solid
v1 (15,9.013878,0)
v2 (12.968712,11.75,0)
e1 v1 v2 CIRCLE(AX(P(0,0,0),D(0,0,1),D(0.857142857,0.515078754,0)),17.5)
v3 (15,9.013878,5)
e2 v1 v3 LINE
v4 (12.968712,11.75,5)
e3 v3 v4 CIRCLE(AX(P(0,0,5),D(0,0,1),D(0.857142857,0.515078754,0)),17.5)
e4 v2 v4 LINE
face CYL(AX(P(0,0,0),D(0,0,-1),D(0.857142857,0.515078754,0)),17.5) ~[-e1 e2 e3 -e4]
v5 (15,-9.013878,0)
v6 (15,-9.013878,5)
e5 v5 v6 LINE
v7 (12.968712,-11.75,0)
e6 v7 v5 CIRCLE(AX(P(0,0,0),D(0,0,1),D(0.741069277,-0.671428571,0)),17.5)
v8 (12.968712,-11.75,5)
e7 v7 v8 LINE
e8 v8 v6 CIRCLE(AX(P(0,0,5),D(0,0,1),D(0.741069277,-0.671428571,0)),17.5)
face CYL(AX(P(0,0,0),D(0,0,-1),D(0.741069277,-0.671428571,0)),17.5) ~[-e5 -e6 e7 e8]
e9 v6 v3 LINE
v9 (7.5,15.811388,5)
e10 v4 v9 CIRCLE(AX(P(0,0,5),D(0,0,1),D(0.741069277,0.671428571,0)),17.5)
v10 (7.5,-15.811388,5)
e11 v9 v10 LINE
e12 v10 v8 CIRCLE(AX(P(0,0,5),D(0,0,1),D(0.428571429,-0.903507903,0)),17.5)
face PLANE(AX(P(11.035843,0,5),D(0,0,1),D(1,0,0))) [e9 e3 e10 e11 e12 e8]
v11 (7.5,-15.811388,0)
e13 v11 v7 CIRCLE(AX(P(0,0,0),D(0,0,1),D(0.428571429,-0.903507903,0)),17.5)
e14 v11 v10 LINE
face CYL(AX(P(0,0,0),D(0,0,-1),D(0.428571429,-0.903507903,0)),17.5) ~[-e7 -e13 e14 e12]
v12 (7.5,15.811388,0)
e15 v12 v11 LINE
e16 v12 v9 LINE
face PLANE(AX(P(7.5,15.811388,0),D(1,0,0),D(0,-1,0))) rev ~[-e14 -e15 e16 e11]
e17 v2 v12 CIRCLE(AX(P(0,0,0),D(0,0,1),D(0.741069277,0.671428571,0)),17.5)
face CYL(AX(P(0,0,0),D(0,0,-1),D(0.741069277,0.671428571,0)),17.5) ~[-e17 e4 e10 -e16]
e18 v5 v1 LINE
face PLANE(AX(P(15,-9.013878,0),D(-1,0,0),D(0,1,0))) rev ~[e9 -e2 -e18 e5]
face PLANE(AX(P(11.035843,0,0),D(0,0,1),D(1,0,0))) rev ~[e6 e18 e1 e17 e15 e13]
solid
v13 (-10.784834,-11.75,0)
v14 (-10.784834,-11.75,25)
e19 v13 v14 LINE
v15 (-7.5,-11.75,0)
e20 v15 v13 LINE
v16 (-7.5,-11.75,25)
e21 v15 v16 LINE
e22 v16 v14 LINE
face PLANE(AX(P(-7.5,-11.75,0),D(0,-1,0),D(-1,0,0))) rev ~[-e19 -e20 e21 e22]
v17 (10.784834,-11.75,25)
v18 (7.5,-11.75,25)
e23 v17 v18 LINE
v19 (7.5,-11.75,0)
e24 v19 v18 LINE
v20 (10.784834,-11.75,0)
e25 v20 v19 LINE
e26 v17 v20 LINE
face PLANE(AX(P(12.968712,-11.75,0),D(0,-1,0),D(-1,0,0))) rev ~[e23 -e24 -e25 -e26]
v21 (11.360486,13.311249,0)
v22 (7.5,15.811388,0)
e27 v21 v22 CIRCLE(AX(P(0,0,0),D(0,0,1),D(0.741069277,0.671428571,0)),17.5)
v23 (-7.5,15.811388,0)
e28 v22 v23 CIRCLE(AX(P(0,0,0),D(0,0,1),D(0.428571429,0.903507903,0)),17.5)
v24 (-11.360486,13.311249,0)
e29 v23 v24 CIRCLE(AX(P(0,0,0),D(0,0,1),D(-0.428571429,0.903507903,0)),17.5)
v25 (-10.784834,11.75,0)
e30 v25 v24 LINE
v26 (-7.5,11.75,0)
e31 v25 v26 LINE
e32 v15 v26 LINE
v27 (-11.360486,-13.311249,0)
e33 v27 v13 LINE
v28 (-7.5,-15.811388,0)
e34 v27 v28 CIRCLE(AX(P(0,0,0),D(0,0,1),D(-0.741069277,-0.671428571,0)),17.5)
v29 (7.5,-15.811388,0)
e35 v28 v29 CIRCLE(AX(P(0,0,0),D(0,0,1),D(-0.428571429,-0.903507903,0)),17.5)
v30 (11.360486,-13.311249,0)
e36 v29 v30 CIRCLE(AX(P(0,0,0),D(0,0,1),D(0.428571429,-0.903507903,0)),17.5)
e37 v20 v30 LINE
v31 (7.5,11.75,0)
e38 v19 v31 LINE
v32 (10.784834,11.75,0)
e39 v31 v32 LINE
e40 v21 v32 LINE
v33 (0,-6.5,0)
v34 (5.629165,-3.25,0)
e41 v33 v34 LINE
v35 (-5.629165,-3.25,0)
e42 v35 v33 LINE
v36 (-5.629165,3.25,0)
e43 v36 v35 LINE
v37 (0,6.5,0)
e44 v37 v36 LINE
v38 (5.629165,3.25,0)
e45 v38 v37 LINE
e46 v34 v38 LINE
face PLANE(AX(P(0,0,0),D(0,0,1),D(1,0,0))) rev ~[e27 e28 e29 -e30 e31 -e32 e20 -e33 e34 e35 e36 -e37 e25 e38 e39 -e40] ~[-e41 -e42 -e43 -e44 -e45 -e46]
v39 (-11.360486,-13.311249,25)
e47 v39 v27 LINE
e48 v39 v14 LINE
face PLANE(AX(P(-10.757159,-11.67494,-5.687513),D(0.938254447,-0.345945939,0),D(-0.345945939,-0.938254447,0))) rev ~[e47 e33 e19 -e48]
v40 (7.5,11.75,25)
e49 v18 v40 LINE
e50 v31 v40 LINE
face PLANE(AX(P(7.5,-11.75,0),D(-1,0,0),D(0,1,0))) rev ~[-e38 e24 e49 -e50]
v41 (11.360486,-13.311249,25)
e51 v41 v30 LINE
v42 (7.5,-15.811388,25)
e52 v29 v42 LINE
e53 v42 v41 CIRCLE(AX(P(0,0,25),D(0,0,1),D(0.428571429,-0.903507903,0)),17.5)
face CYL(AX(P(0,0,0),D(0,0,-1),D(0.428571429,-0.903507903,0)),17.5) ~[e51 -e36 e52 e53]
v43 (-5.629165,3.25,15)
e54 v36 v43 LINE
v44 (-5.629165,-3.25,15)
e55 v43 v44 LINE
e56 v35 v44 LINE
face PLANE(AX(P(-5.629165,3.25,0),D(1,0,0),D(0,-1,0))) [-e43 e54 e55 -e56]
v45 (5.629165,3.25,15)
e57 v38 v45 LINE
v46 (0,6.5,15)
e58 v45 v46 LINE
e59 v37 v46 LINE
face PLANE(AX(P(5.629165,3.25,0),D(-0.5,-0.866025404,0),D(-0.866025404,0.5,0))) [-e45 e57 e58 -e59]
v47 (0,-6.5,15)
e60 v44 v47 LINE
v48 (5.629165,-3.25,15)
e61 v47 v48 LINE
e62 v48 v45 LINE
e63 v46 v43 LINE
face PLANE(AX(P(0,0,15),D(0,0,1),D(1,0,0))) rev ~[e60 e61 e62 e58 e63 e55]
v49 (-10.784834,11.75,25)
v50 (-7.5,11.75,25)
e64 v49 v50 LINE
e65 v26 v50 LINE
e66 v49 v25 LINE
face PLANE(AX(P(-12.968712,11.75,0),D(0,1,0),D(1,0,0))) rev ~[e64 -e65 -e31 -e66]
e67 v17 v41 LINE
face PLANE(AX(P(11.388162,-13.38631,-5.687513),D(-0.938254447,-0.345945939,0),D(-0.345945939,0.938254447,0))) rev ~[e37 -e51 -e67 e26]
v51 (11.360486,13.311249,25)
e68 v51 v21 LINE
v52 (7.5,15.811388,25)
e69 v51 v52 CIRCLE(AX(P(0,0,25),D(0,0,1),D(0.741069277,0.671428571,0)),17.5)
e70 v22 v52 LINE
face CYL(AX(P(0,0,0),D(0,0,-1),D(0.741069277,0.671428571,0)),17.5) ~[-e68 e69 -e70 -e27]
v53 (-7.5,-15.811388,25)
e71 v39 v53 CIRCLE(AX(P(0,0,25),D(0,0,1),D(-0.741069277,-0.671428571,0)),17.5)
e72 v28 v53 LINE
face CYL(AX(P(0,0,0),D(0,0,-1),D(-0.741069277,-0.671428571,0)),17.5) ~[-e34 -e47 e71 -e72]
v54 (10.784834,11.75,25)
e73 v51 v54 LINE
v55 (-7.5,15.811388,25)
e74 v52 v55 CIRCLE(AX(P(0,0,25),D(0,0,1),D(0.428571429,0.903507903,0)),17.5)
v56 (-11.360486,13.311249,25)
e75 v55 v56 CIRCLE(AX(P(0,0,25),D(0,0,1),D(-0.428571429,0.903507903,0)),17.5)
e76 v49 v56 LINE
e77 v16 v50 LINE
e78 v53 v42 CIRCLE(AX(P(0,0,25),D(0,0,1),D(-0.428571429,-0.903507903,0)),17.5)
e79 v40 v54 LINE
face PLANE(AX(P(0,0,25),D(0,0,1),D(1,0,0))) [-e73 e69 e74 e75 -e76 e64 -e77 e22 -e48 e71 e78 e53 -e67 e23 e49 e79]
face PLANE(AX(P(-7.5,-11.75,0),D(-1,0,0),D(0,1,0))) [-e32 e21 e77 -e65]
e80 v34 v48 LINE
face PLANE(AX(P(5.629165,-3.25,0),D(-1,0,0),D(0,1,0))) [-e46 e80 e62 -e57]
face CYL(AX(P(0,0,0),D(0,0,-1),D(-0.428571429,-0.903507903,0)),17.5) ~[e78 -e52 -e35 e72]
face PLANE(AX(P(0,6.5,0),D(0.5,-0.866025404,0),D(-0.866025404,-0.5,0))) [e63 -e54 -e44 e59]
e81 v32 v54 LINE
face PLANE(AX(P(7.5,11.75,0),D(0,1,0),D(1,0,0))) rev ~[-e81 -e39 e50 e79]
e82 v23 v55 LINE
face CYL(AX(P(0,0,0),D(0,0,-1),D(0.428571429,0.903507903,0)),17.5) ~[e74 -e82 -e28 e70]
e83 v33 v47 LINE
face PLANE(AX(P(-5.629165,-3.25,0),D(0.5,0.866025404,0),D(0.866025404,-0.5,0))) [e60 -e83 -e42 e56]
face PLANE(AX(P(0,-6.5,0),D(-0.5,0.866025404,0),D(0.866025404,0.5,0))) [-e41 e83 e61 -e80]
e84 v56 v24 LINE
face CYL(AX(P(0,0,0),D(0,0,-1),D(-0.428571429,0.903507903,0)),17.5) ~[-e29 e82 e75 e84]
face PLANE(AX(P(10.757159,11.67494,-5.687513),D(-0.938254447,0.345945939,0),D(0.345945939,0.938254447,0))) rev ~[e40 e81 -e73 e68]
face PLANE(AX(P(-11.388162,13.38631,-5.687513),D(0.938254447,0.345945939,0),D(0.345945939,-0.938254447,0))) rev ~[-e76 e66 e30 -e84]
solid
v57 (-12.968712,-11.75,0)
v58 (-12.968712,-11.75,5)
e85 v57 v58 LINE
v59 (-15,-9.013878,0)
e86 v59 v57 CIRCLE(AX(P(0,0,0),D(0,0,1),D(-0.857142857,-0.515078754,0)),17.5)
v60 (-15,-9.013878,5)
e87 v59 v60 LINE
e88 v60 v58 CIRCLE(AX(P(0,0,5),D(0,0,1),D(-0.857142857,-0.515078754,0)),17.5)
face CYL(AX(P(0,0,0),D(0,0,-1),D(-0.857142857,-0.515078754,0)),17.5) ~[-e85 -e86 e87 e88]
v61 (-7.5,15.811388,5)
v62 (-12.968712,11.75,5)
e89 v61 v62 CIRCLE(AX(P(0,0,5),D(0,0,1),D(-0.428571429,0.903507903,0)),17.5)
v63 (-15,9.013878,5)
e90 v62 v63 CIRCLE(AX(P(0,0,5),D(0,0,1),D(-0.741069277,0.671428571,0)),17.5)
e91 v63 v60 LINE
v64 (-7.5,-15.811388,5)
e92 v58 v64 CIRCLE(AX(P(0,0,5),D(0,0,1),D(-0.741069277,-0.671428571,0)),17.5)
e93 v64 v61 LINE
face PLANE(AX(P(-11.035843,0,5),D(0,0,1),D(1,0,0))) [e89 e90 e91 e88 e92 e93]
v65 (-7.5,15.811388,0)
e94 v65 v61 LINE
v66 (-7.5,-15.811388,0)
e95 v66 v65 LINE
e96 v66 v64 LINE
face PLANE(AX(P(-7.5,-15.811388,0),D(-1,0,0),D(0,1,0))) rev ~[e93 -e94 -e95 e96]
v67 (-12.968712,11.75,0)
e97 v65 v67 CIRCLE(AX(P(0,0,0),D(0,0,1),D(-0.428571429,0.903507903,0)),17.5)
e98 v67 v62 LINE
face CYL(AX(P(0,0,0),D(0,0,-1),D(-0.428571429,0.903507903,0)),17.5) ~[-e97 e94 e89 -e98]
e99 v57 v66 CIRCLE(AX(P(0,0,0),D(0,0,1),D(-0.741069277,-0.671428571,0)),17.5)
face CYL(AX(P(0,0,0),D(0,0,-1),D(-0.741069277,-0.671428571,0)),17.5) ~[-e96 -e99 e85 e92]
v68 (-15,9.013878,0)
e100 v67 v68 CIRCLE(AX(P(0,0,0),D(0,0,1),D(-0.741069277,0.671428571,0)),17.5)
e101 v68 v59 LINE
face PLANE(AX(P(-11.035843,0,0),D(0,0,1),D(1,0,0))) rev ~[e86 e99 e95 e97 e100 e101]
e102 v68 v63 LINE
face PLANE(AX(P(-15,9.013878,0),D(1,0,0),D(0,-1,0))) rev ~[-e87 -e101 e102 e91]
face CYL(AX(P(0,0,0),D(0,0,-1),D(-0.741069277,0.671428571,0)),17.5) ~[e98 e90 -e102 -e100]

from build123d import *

# Parameters (mm, degrees)
F1_DEPTH    = 5
F0_W        = 15
F0_H        = 23.5
F2_DEPTH    = 25
F3_T1_DEPTH = 36.3750267574
F4_DEPTH    = 15


# Not quite as in the source:
# - a fillet or chamfer that OpenCascade refuses, or shapes differently, is made with other operations: its cross-section is extruded or revolved along the edge and cut away or added
# - a feature names something its author has since deleted; it is built from what else it names


with BuildPart() as f1:
    # F0 (on Top) → F1 (new body)
    with BuildSketch(Plane.XY):
        with BuildLine():
            Line((15, -9.0138781887), (15, 9.0138781887))
            ThreePointArc((15, 9.0138781887), (14.0511141288, 10.4314999755), (12.9687123493, 11.75))
            Line((12.9687123493, 11.75), (7.5, 11.75))
            Line((7.5, 11.75), (7.5, -11.75))
            Line((7.5, -11.75), (12.9687123493, -11.75))
            ThreePointArc((12.9687123493, -11.75), (14.0511141288, -10.4314999755), (15, -9.0138781887))
        make_face()
        with BuildLine():
            ThreePointArc((7.5, -15.8113883008), (10.4338758399, -14.0493499834), (12.9687123493, -11.75))
            Line((12.9687123493, -11.75), (7.5, -11.75))
            Line((7.5, -11.75), (7.5, -15.8113883008))
        make_face()
        with BuildLine():
            Line((7.5, 11.75), (12.9687123493, 11.75))
            ThreePointArc((12.9687123493, 11.75), (10.4338758399, 14.0493499834), (7.5, 15.8113883008))
            Line((7.5, 15.8113883008), (7.5, 11.75))
        make_face()
    extrude(amount=F1_DEPTH)


with BuildPart() as f1b:
    # F0 (on Top) → F1, piece 2 (new body)
    with BuildSketch(Plane.XY):
        with BuildLine():
            Line((-7.5, -11.75), (-7.5, 11.75))
            Line((-7.5, 11.75), (-12.9687123493, 11.75))
            ThreePointArc((-12.9687123493, 11.75), (-14.0511141288, 10.4314999755), (-15, 9.0138781887))
            Line((-15, 9.0138781887), (-15, -9.0138781887))
            ThreePointArc((-15, -9.0138781887), (-14.0511141288, -10.4314999755), (-12.9687123493, -11.75))
            Line((-12.9687123493, -11.75), (-7.5, -11.75))
        make_face()
        with BuildLine():
            Line((-7.5, 11.75), (-7.5, 15.8113883008))
            ThreePointArc((-7.5, 15.8113883008), (-10.4338758399, 14.0493499834), (-12.9687123493, 11.75))
            Line((-12.9687123493, 11.75), (-7.5, 11.75))
        make_face()
        with BuildLine():
            ThreePointArc((-12.9687123493, -11.75), (-10.4338758399, -14.0493499834), (-7.5, -15.8113883008))
            Line((-7.5, -15.8113883008), (-7.5, -11.75))
            Line((-7.5, -11.75), (-12.9687123493, -11.75))
        make_face()
    extrude(amount=F1_DEPTH)


with BuildPart() as f2:
    # F0 (on Top) → F2 (new body)
    with BuildSketch(Plane.XY):
        Rectangle(F0_W, F0_H)
        Polygon((-5.6291651246, 3.25), (0, 6.5), (5.6291651246, 3.25), (5.6291651246, -3.25), (0, -6.5), (-5.6291651246, -3.25), align=None, mode=Mode.SUBTRACT)
        with BuildLine():
            ThreePointArc((-12.9687123493, -11.75), (-10.4338758399, -14.0493499834), (-7.5, -15.8113883008))
            Line((-7.5, -15.8113883008), (-7.5, -11.75))
            Line((-7.5, -11.75), (-12.9687123493, -11.75))
        make_face()
        with BuildLine():
            Line((-7.5, 11.75), (-7.5, 15.8113883008))
            ThreePointArc((-7.5, 15.8113883008), (-10.4338758399, 14.0493499834), (-12.9687123493, 11.75))
            Line((-12.9687123493, 11.75), (-7.5, 11.75))
        make_face()
        with BuildLine():
            Line((7.5, 11.75), (12.9687123493, 11.75))
            ThreePointArc((12.9687123493, 11.75), (10.4338758399, 14.0493499834), (7.5, 15.8113883008))
            Line((7.5, 15.8113883008), (7.5, 11.75))
        make_face()
        with BuildLine():
            ThreePointArc((7.5, -15.8113883008), (10.4338758399, -14.0493499834), (12.9687123493, -11.75))
            Line((12.9687123493, -11.75), (7.5, -11.75))
            Line((7.5, -11.75), (7.5, -15.8113883008))
        make_face()
        with BuildLine():
            Line((7.5, 11.75), (7.5, 15.8113883008))
            ThreePointArc((7.5, 15.8113883008), (0, 17.5), (-7.5, 15.8113883008))
            Line((-7.5, 15.8113883008), (-7.5, 11.75))
            Line((-7.5, 11.75), (7.5, 11.75))
        make_face()
        with BuildLine():
            ThreePointArc((-7.5, -15.8113883008), (0, -17.5), (7.5, -15.8113883008))
            Line((7.5, -15.8113883008), (7.5, -11.75))
            Line((7.5, -11.75), (-7.5, -11.75))
            Line((-7.5, -11.75), (-7.5, -15.8113883008))
        make_face()
        Polygon((5.6291651246, 3.25), (0, 6.5), (-5.6291651246, 3.25), (-5.6291651246, -3.25), (0, -6.5), (5.6291651246, -3.25), align=None)
    extrude(amount=F2_DEPTH)

    # F3: chamfer of 2 on 4 edges, made by hand

    # F3_s2 → F3_t1 (cut)
    with BuildSketch(Plane.XY.offset(-5.6875133787)):
        with BuildLine():
            Line((-10.7571586121, -11.6749396443), (-11.3881617362, -13.3863096005))
            Line((-11.3881617362, -13.3863096005), (-11.4141285615, -13.4167353131))
            ThreePointArc((-11.4141285615, -13.4167353131), (-12.2058182488, -12.5964122224), (-12.9983551204, -11.7768571429))
            Line((-12.9983551204, -11.7768571429), (-12.9687123493, -11.71))
            ThreePointArc((-12.9687123493, -11.71), (-11.8629354807, -11.71), (-10.7571586121, -11.6349396443))
            Line((-10.7571586121, -11.6349396443), (-10.7571586121, -11.6749396443))
        make_face()
        with BuildLine():
            Line((11.3881617362, -13.3863096005), (10.7571586121, -11.6749396443))
            Line((10.7571586121, -11.6749396443), (10.7571586121, -11.6349396443))
            ThreePointArc((10.7571586121, -11.6349396443), (11.8629354807, -11.71), (12.9687123493, -11.71))
            Line((12.9687123493, -11.71), (12.9983551204, -11.7768571429))
            ThreePointArc((12.9983551204, -11.7768571429), (12.2058182488, -12.5964122224), (11.4141285615, -13.4167353131))
            Line((11.4141285615, -13.4167353131), (11.3881617362, -13.3863096005))
        make_face()
        with BuildLine():
            Line((10.7571586121, 11.6749396443), (11.3881617362, 13.3863096005))
            Line((11.3881617362, 13.3863096005), (11.4141285615, 13.4167353131))
            ThreePointArc((11.4141285615, 13.4167353131), (12.2058182488, 12.5964122224), (12.9983551204, 11.7768571429))
            Line((12.9983551204, 11.7768571429), (12.9687123493, 11.71))
            ThreePointArc((12.9687123493, 11.71), (11.8629354807, 11.71), (10.7571586121, 11.6349396443))
            Line((10.7571586121, 11.6349396443), (10.7571586121, 11.6749396443))
        make_face()
        with BuildLine():
            Line((-11.3881617362, 13.3863096005), (-10.7571586121, 11.6749396443))
            Line((-10.7571586121, 11.6749396443), (-10.7571586121, 11.6349396443))
            ThreePointArc((-10.7571586121, 11.6349396443), (-11.8629354807, 11.71), (-12.9687123493, 11.71))
            Line((-12.9687123493, 11.71), (-12.9983551204, 11.7768571429))
            ThreePointArc((-12.9983551204, 11.7768571429), (-12.2058182488, 12.5964122224), (-11.4141285615, 13.4167353131))
            Line((-11.4141285615, 13.4167353131), (-11.3881617362, 13.3863096005))
        make_face()
    extrude(amount=F3_T1_DEPTH, mode=Mode.SUBTRACT)

    # F0 (on Top) → F4 (cut)
    with BuildSketch(Plane.XY):
        Polygon((5.6291651246, 3.25), (0, 6.5), (-5.6291651246, 3.25), (-5.6291651246, -3.25), (0, -6.5), (5.6291651246, -3.25), align=None)
    extrude(amount=F4_DEPTH, mode=Mode.SUBTRACT)


solid = Compound([f1.part, f1b.part, f2.part])
